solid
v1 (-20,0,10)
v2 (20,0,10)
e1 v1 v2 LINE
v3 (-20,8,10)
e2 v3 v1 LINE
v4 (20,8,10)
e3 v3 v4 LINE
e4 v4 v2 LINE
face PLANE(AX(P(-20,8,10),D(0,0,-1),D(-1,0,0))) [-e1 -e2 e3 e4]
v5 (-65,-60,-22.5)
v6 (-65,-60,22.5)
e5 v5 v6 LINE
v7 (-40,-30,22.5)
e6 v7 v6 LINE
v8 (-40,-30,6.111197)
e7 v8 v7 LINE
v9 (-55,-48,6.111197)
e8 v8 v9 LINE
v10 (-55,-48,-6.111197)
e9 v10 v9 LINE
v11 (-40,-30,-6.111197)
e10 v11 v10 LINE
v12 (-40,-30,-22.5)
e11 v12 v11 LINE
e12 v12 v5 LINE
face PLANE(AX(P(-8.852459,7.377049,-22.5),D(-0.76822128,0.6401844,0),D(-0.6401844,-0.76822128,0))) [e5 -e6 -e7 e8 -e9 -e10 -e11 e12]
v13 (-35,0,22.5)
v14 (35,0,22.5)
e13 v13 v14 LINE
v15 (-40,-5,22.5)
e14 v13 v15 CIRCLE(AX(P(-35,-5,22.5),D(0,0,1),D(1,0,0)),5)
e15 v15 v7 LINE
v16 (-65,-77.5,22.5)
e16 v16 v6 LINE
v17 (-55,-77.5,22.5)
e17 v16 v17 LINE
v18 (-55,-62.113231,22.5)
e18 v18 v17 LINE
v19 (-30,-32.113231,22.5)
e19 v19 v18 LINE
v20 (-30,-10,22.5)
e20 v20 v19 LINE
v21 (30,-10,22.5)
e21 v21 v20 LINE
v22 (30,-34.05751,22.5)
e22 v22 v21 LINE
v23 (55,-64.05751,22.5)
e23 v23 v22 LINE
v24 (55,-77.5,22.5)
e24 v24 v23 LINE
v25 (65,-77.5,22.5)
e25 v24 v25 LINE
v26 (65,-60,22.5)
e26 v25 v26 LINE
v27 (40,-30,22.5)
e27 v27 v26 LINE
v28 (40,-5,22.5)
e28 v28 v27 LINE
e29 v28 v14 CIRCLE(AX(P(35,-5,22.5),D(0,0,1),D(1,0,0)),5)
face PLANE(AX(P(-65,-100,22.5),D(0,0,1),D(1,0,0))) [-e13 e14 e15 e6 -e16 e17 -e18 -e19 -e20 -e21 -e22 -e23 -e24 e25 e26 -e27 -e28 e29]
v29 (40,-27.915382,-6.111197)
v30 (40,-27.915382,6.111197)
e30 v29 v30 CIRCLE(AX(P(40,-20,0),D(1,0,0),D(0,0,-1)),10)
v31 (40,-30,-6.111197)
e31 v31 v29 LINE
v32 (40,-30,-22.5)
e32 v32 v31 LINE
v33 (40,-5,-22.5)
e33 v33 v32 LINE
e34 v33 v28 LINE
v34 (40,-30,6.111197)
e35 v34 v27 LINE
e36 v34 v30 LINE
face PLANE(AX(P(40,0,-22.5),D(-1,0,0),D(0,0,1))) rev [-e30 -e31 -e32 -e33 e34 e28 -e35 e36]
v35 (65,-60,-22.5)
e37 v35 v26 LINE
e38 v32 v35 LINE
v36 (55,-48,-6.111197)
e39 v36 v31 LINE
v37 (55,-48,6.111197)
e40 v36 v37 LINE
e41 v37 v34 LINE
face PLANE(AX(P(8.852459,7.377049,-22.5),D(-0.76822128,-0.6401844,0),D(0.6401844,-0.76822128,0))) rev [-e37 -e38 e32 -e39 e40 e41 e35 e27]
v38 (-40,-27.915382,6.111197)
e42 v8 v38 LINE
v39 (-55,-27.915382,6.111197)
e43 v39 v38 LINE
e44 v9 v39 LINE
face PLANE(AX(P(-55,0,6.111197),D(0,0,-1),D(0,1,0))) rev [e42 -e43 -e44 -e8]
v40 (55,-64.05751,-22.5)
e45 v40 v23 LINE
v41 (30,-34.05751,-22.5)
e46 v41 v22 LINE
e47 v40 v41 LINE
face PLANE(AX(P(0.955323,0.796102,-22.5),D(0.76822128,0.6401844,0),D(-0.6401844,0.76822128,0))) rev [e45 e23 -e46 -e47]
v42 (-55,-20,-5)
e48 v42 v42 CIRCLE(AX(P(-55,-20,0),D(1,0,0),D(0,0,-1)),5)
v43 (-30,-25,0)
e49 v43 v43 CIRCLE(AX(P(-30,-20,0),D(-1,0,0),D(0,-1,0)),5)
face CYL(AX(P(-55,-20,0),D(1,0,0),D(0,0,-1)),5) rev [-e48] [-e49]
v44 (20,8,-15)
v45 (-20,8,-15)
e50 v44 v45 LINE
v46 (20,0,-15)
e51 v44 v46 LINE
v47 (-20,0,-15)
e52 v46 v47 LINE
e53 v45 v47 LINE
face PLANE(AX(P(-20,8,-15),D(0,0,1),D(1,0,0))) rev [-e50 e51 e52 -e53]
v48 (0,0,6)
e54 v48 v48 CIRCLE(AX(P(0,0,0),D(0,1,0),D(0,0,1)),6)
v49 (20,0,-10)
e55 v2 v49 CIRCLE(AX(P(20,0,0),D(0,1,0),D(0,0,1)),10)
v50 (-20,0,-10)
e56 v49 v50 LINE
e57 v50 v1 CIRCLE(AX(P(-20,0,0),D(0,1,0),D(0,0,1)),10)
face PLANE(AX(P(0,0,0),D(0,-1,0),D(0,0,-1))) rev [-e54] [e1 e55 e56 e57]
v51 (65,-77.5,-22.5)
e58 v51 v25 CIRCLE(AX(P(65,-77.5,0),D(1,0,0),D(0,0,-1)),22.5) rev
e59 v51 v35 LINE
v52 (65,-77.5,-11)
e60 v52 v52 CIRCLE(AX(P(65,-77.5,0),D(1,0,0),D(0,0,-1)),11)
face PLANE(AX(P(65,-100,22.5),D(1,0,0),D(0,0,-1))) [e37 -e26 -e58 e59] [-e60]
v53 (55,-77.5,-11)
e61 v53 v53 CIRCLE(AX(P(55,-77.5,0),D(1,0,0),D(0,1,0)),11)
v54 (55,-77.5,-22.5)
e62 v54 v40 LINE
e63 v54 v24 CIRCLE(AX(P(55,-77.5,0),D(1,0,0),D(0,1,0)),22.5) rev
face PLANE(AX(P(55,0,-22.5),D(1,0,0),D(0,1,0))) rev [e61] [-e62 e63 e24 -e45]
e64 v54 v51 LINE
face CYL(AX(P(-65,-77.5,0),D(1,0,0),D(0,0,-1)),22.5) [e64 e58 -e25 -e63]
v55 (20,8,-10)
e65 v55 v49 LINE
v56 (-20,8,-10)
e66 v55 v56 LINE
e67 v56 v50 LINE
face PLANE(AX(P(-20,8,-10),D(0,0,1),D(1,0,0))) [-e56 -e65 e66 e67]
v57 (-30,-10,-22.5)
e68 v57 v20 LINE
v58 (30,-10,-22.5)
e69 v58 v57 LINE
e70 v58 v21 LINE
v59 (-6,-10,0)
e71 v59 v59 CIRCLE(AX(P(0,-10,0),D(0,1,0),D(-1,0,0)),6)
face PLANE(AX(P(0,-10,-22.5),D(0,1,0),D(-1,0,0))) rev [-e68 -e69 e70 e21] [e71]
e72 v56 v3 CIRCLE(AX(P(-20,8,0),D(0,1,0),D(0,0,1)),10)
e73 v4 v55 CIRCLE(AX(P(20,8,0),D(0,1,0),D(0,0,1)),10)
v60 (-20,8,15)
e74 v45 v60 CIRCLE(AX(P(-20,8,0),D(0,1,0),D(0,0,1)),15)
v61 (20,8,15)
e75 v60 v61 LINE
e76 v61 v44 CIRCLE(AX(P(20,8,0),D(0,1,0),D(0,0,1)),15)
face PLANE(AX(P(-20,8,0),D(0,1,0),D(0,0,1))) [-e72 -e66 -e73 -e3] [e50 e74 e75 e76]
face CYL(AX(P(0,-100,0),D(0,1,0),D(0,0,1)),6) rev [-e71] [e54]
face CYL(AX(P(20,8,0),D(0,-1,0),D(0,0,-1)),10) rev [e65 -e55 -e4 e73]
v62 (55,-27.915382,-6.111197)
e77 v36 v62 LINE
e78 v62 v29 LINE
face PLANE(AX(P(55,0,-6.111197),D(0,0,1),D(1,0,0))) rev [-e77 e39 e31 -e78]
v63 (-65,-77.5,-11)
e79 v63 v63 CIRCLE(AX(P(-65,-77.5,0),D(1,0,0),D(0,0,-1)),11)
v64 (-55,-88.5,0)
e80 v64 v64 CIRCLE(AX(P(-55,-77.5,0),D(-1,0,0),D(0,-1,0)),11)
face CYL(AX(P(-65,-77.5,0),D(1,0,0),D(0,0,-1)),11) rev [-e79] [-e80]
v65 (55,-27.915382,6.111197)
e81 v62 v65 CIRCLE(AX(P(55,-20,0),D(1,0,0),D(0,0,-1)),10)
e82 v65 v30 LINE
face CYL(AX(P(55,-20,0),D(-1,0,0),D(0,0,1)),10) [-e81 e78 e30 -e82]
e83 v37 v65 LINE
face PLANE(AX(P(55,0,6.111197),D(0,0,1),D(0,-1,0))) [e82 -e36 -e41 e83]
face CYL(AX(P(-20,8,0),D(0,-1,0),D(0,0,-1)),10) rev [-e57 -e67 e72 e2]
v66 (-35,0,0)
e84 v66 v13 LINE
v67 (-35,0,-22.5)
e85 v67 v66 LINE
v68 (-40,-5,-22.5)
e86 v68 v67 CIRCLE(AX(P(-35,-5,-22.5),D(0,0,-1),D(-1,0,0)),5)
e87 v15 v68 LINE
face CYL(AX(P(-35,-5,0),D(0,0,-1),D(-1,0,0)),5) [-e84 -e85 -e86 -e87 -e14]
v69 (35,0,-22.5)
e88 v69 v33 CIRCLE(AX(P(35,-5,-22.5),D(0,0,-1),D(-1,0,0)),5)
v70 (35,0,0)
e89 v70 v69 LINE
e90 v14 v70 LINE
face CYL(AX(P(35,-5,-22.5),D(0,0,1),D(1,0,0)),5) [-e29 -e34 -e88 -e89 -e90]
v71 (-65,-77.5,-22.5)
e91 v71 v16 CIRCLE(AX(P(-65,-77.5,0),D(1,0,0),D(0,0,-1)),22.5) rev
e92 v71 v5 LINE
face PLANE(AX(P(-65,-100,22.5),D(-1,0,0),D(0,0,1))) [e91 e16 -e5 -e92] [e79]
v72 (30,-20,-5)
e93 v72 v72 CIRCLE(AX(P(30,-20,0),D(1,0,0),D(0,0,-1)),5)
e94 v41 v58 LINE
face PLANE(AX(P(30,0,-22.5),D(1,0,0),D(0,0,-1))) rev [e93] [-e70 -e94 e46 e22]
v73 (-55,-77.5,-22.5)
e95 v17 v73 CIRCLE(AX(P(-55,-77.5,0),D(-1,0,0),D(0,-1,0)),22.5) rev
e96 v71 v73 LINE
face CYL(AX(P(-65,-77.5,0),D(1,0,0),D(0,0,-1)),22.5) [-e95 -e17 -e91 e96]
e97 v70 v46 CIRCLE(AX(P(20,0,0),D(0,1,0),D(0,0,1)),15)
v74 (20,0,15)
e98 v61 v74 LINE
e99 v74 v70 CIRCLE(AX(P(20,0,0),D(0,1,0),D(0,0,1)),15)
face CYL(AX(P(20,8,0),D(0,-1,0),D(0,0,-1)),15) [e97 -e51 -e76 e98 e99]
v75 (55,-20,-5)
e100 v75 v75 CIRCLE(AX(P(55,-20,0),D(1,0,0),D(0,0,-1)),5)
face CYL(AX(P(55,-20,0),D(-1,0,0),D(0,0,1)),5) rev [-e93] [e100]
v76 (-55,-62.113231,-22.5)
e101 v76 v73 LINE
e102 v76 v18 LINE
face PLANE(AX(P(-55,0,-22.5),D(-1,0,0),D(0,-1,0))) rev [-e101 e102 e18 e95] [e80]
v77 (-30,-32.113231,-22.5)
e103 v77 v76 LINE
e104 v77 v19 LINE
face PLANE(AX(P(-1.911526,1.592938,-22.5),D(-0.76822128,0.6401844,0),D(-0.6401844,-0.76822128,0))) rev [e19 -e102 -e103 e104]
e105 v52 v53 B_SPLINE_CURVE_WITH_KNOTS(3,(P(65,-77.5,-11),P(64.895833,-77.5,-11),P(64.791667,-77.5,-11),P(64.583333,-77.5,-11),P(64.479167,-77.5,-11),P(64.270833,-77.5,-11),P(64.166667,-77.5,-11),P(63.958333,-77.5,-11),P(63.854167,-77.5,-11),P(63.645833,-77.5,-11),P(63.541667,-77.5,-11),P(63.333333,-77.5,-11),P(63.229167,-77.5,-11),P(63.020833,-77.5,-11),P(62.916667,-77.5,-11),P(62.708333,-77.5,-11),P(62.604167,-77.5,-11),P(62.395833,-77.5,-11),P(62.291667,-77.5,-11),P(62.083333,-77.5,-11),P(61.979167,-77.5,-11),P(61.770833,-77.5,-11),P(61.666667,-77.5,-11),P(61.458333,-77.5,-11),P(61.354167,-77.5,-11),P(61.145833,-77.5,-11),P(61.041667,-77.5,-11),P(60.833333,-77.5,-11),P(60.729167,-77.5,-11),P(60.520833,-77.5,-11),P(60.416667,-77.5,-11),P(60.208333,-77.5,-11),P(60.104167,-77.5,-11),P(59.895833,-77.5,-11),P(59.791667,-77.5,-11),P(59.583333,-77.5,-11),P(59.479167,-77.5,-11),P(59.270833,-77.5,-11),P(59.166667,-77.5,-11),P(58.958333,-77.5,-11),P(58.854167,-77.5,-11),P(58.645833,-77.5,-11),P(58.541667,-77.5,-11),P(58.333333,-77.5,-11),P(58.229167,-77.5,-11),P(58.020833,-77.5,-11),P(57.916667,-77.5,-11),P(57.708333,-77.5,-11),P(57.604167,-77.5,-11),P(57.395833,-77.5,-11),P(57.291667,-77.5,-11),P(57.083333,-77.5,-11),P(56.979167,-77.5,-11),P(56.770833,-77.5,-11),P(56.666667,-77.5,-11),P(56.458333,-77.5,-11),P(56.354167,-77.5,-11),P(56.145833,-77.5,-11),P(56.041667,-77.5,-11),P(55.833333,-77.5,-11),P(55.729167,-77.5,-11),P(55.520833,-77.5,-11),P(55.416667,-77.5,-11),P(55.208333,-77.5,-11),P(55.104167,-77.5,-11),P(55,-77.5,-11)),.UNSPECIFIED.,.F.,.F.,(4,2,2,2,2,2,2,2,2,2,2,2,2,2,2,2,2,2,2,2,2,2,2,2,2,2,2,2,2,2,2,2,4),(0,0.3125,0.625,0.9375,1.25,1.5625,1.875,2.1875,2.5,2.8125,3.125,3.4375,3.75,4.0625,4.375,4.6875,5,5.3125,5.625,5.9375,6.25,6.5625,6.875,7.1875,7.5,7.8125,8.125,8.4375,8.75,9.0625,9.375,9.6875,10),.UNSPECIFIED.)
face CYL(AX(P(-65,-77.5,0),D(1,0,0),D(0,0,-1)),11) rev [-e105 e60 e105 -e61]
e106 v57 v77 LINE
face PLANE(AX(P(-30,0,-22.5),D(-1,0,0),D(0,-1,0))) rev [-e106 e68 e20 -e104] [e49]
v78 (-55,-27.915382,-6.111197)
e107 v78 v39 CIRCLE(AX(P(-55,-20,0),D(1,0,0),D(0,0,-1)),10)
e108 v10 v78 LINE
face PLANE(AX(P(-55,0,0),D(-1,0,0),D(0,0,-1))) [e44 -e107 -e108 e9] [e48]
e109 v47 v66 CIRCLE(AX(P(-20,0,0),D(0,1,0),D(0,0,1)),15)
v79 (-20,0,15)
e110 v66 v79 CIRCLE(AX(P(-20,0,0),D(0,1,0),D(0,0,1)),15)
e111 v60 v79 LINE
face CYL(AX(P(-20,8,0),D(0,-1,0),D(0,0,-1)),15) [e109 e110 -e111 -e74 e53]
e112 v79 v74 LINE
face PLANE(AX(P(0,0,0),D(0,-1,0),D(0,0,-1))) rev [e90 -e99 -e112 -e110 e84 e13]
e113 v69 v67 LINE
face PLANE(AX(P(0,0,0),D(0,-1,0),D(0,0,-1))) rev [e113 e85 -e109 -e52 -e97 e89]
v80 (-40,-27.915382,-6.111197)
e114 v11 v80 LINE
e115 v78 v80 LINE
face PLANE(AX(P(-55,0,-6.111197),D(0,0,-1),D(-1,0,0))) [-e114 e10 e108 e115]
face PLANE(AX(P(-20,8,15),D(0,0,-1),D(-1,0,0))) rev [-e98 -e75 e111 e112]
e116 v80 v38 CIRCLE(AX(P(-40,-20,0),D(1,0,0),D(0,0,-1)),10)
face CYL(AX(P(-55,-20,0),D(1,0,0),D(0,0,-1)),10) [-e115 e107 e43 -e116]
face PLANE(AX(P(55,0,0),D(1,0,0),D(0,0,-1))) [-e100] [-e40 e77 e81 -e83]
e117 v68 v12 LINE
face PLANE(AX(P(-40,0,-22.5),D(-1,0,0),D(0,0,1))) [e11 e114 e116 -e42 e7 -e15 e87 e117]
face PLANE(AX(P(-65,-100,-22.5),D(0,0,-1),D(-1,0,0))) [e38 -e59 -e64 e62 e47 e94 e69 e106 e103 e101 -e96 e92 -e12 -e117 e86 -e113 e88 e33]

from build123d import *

# Parameters (mm, degrees)
SKETCH3_W               = 130
SKETCH3_H               = 45
BOSS_EXTRUDE1_DEPTH     = 100
CUT_EXTRUDE1_DEPTH      = 122.372360939
CUT_EXTRUDE1_DEPTH_BACK = 122.372360939
BOSS_EXTRUDE2_DEPTH     = 8
CUT_EXTRUDE2_DEPTH      = 122.372360939
CUT_EXTRUDE2_DEPTH_BACK = 122.372360939
CUT_EXTRUDE3_DEPTH      = 122.372360939
CUT_EXTRUDE3_DEPTH_BACK = 122.372360939
CUT_EXTRUDE4_DEPTH      = 122.372360939
CUT_EXTRUDE4_DEPTH_BACK = 122.372360939
FILLET3_R               = 5
SKETCH16_R              = 10
SKETCH16_R_2            = 5
BOSS_EXTRUDE3_DEPTH     = 15
SKETCH19_R              = 6
CUT_EXTRUDE5_DEPTH      = 122.372360939
CUT_EXTRUDE6_DEPTH      = 147.735305908
CUT_EXTRUDE6_DEPTH_BACK = 147.735305908
SKETCH23_R              = 5
CUT_EXTRUDE7_DEPTH      = 15
CUT_EXTRUDE8_DEPTH      = 15
CUT_EXTRUDE9_DEPTH      = 166.548331311
CUT_EXTRUDE9_DEPTH_BACK = 166.548331311
SKETCH28_R              = 11


with BuildPart() as part:
    # Sketch3 → Boss-Extrude1 (new body)
    with BuildSketch(Plane(origin=(0, 0, 0), x_dir=(1, 0, 0), z_dir=(0, 1, 0))):
        Rectangle(SKETCH3_W, SKETCH3_H)
    extrude(amount=-BOSS_EXTRUDE1_DEPTH)

    # Sketch5 → Cut-Extrude1 (cut, two sides: drawn at the far end of the back side and taken through both)
    with BuildSketch(Plane.XY.offset(-CUT_EXTRUDE1_DEPTH_BACK)):
        Polygon((-65, 0), (-40, 0), (-40, -30), (-65, -60), align=None)
        Polygon((65, 0), (40, 0), (40, -30), (65, -60), align=None)
    extrude(amount=CUT_EXTRUDE1_DEPTH + CUT_EXTRUDE1_DEPTH_BACK, mode=Mode.SUBTRACT)

    # Sketch7 → Boss-Extrude2 (add)
    with BuildSketch(Plane(origin=(0, 0, 0), x_dir=(1, 0, 0), z_dir=(0, 1, 0))):
        with BuildLine():
            Line((-20, 15), (20, 15))
            ThreePointArc((20, 15), (35, 0), (20, -15))
            Line((20, -15), (-20, -15))
            ThreePointArc((-20, -15), (-35, 0), (-20, 15))
        make_face()
        with BuildLine():
            Line((-20, 10), (20, 10))
            ThreePointArc((20, 10), (30, 0), (20, -10))
            Line((20, -10), (-20, -10))
            ThreePointArc((-20, -10), (-30, 0), (-20, 10))
        make_face(mode=Mode.SUBTRACT)
    extrude(amount=BOSS_EXTRUDE2_DEPTH)

    # Sketch9 → Cut-Extrude2 (cut, two sides: drawn at the far end of the back side and taken through both)
    with BuildSketch(Plane.XY.offset(-CUT_EXTRUDE2_DEPTH_BACK)):
        Polygon((-30, -32.113231403), (-55, -62.113231403), (-55, -100), (55, -100), (55, -64.057510222), (30, -34.057510222), (30, -10), (-30, -10), align=None)
    extrude(amount=CUT_EXTRUDE2_DEPTH + CUT_EXTRUDE2_DEPTH_BACK, mode=Mode.SUBTRACT)

    # Sketch11 → Cut-Extrude3 (cut, two sides: drawn at the far end of the back side and taken through both)
    with BuildSketch(Plane(origin=(0, 0, 0), x_dir=(0, 0, -1), z_dir=(1, 0, 0)).offset(-CUT_EXTRUDE3_DEPTH_BACK)):
        with BuildLine():
            Line((-22.5, -100), (0, -100))
            ThreePointArc((0, -100), (-15.909902577, -93.409902577), (-22.5, -77.5))
            Line((-22.5, -77.5), (-22.5, -100))
        make_face()
    extrude(amount=CUT_EXTRUDE3_DEPTH + CUT_EXTRUDE3_DEPTH_BACK, mode=Mode.SUBTRACT)

    # Sketch12 → Cut-Extrude4 (cut, two sides: drawn at the far end of the back side and taken through both)
    with BuildSketch(Plane(origin=(0, 0, 0), x_dir=(0, 0, -1), z_dir=(1, 0, 0)).offset(-CUT_EXTRUDE4_DEPTH_BACK)):
        with BuildLine():
            Line((22.5, -100), (22.5, -77.5))
            ThreePointArc((22.5, -77.5), (15.909902577, -93.409902577), (0, -100))
            Line((0, -100), (22.5, -100))
        make_face()
    extrude(amount=CUT_EXTRUDE4_DEPTH + CUT_EXTRUDE4_DEPTH_BACK, mode=Mode.SUBTRACT)

    # Fillet3
    fillet3_edges = [part.edges().sort_by_distance(p)[0] for p in [
        (-40, 0, 0),
        (40, 0, 0),
    ]]
    fillet(fillet3_edges, radius=FILLET3_R - 0.0001)  # a hair under: the kernel refuses the full size

    # Sketch16 → Boss-Extrude3 (add)
    # profile 1 of 4: a face of its own
    with BuildSketch(Plane(origin=(40, 0, 0), x_dir=(0, 0, -1), z_dir=(1, 0, 0))):
        with Locations((0, -20)):
            Circle(SKETCH16_R)
        with Locations((0, -20)):
            Circle(SKETCH16_R_2, mode=Mode.SUBTRACT)
    # profile 2 of 4: a face of its own
    with BuildSketch(Plane(origin=(40, 0, 0), x_dir=(0, 0, -1), z_dir=(1, 0, 0))):
        with BuildLine():
            Line((1.3e-08, -30), (6.111197294, -30))
            Line((6.111197294, -30), (6.111197294, -27.915381711))
            ThreePointArc((6.111197294, -27.915381711), (3.228481297, -29.464507833), (1.3e-08, -30))
        make_face()
    # profile 3 of 4: a face of its own
    with BuildSketch(Plane(origin=(40, 0, 0), x_dir=(0, 0, -1), z_dir=(1, 0, 0))):
        with BuildLine():
            Line((-6.111197294, -27.915381711), (-6.111197294, -30))
            Line((-6.111197294, -30), (1.3e-08, -30))
            ThreePointArc((1.3e-08, -30), (-3.228481284, -29.464507837), (-6.111197294, -27.915381711))
        make_face()
    # profile 4 of 4: a face of its own
    with BuildSketch(Plane(origin=(40, 0, 0), x_dir=(0, 0, -1), z_dir=(1, 0, 0))):
        Polygon((-6.111197294, -30), (-6.111197294, -48.004109964), (6.111197294, -48.004109964), (6.111197294, -30), (1.3e-08, -30), align=None)
    boss_extrude3 = extrude(amount=BOSS_EXTRUDE3_DEPTH)

    # Mirror4: Boss-Extrude3 across plane
    add(boss_extrude3.mirror(Plane(origin=(0, 0, 0), x_dir=(0, 0, 1), z_dir=(1, 0, 0))))

    # Sketch19 → Cut-Extrude5 (cut, through all)
    with BuildSketch(Plane(origin=(0, 0, 0), x_dir=(1, 0, 0), z_dir=(0, 1, 0))):
        with Locations(Location((0, 0, 0), (0, 0, 270))):
            Circle(SKETCH19_R)
    extrude(amount=-CUT_EXTRUDE5_DEPTH, mode=Mode.SUBTRACT)

    # Sketch23 → Cut-Extrude6 (cut, two sides: drawn at the far end of the back side and taken through both)
    with BuildSketch(Plane(origin=(40, 0, 0), x_dir=(0, 0, -1), z_dir=(1, 0, 0)).offset(-CUT_EXTRUDE6_DEPTH_BACK)):
        with Locations((0, -20)):
            Circle(SKETCH23_R)
    extrude(amount=CUT_EXTRUDE6_DEPTH + CUT_EXTRUDE6_DEPTH_BACK, mode=Mode.SUBTRACT)

    # Sketch26 → Cut-Extrude7 (cut)
    with BuildSketch(Plane.XY.offset(6.111197294)):
        Polygon((-40, -44.113231403), (-40, -48.004109964), (-43.2423988, -48.004109964), align=None)
    extrude(amount=-CUT_EXTRUDE7_DEPTH, mode=Mode.SUBTRACT)

    # Sketch27 → Cut-Extrude8 (cut)
    with BuildSketch(Plane.XY.offset(6.111197294)):
        Polygon((40, -46.057510222), (40, -48.004109964), (41.622166452, -48.004109964), align=None)
    extrude(amount=-CUT_EXTRUDE8_DEPTH, mode=Mode.SUBTRACT)

    # Sketch28 → Cut-Extrude9 (cut, two sides: drawn at the far end of the back side and taken through both)
    with BuildSketch(Plane(origin=(65, 0, 0), x_dir=(0, 0, -1), z_dir=(1, 0, 0)).offset(-CUT_EXTRUDE9_DEPTH_BACK)):
        with Locations((0, -77.5)):
            Circle(SKETCH28_R)
    extrude(amount=CUT_EXTRUDE9_DEPTH + CUT_EXTRUDE9_DEPTH_BACK, mode=Mode.SUBTRACT)


solid = part.part
